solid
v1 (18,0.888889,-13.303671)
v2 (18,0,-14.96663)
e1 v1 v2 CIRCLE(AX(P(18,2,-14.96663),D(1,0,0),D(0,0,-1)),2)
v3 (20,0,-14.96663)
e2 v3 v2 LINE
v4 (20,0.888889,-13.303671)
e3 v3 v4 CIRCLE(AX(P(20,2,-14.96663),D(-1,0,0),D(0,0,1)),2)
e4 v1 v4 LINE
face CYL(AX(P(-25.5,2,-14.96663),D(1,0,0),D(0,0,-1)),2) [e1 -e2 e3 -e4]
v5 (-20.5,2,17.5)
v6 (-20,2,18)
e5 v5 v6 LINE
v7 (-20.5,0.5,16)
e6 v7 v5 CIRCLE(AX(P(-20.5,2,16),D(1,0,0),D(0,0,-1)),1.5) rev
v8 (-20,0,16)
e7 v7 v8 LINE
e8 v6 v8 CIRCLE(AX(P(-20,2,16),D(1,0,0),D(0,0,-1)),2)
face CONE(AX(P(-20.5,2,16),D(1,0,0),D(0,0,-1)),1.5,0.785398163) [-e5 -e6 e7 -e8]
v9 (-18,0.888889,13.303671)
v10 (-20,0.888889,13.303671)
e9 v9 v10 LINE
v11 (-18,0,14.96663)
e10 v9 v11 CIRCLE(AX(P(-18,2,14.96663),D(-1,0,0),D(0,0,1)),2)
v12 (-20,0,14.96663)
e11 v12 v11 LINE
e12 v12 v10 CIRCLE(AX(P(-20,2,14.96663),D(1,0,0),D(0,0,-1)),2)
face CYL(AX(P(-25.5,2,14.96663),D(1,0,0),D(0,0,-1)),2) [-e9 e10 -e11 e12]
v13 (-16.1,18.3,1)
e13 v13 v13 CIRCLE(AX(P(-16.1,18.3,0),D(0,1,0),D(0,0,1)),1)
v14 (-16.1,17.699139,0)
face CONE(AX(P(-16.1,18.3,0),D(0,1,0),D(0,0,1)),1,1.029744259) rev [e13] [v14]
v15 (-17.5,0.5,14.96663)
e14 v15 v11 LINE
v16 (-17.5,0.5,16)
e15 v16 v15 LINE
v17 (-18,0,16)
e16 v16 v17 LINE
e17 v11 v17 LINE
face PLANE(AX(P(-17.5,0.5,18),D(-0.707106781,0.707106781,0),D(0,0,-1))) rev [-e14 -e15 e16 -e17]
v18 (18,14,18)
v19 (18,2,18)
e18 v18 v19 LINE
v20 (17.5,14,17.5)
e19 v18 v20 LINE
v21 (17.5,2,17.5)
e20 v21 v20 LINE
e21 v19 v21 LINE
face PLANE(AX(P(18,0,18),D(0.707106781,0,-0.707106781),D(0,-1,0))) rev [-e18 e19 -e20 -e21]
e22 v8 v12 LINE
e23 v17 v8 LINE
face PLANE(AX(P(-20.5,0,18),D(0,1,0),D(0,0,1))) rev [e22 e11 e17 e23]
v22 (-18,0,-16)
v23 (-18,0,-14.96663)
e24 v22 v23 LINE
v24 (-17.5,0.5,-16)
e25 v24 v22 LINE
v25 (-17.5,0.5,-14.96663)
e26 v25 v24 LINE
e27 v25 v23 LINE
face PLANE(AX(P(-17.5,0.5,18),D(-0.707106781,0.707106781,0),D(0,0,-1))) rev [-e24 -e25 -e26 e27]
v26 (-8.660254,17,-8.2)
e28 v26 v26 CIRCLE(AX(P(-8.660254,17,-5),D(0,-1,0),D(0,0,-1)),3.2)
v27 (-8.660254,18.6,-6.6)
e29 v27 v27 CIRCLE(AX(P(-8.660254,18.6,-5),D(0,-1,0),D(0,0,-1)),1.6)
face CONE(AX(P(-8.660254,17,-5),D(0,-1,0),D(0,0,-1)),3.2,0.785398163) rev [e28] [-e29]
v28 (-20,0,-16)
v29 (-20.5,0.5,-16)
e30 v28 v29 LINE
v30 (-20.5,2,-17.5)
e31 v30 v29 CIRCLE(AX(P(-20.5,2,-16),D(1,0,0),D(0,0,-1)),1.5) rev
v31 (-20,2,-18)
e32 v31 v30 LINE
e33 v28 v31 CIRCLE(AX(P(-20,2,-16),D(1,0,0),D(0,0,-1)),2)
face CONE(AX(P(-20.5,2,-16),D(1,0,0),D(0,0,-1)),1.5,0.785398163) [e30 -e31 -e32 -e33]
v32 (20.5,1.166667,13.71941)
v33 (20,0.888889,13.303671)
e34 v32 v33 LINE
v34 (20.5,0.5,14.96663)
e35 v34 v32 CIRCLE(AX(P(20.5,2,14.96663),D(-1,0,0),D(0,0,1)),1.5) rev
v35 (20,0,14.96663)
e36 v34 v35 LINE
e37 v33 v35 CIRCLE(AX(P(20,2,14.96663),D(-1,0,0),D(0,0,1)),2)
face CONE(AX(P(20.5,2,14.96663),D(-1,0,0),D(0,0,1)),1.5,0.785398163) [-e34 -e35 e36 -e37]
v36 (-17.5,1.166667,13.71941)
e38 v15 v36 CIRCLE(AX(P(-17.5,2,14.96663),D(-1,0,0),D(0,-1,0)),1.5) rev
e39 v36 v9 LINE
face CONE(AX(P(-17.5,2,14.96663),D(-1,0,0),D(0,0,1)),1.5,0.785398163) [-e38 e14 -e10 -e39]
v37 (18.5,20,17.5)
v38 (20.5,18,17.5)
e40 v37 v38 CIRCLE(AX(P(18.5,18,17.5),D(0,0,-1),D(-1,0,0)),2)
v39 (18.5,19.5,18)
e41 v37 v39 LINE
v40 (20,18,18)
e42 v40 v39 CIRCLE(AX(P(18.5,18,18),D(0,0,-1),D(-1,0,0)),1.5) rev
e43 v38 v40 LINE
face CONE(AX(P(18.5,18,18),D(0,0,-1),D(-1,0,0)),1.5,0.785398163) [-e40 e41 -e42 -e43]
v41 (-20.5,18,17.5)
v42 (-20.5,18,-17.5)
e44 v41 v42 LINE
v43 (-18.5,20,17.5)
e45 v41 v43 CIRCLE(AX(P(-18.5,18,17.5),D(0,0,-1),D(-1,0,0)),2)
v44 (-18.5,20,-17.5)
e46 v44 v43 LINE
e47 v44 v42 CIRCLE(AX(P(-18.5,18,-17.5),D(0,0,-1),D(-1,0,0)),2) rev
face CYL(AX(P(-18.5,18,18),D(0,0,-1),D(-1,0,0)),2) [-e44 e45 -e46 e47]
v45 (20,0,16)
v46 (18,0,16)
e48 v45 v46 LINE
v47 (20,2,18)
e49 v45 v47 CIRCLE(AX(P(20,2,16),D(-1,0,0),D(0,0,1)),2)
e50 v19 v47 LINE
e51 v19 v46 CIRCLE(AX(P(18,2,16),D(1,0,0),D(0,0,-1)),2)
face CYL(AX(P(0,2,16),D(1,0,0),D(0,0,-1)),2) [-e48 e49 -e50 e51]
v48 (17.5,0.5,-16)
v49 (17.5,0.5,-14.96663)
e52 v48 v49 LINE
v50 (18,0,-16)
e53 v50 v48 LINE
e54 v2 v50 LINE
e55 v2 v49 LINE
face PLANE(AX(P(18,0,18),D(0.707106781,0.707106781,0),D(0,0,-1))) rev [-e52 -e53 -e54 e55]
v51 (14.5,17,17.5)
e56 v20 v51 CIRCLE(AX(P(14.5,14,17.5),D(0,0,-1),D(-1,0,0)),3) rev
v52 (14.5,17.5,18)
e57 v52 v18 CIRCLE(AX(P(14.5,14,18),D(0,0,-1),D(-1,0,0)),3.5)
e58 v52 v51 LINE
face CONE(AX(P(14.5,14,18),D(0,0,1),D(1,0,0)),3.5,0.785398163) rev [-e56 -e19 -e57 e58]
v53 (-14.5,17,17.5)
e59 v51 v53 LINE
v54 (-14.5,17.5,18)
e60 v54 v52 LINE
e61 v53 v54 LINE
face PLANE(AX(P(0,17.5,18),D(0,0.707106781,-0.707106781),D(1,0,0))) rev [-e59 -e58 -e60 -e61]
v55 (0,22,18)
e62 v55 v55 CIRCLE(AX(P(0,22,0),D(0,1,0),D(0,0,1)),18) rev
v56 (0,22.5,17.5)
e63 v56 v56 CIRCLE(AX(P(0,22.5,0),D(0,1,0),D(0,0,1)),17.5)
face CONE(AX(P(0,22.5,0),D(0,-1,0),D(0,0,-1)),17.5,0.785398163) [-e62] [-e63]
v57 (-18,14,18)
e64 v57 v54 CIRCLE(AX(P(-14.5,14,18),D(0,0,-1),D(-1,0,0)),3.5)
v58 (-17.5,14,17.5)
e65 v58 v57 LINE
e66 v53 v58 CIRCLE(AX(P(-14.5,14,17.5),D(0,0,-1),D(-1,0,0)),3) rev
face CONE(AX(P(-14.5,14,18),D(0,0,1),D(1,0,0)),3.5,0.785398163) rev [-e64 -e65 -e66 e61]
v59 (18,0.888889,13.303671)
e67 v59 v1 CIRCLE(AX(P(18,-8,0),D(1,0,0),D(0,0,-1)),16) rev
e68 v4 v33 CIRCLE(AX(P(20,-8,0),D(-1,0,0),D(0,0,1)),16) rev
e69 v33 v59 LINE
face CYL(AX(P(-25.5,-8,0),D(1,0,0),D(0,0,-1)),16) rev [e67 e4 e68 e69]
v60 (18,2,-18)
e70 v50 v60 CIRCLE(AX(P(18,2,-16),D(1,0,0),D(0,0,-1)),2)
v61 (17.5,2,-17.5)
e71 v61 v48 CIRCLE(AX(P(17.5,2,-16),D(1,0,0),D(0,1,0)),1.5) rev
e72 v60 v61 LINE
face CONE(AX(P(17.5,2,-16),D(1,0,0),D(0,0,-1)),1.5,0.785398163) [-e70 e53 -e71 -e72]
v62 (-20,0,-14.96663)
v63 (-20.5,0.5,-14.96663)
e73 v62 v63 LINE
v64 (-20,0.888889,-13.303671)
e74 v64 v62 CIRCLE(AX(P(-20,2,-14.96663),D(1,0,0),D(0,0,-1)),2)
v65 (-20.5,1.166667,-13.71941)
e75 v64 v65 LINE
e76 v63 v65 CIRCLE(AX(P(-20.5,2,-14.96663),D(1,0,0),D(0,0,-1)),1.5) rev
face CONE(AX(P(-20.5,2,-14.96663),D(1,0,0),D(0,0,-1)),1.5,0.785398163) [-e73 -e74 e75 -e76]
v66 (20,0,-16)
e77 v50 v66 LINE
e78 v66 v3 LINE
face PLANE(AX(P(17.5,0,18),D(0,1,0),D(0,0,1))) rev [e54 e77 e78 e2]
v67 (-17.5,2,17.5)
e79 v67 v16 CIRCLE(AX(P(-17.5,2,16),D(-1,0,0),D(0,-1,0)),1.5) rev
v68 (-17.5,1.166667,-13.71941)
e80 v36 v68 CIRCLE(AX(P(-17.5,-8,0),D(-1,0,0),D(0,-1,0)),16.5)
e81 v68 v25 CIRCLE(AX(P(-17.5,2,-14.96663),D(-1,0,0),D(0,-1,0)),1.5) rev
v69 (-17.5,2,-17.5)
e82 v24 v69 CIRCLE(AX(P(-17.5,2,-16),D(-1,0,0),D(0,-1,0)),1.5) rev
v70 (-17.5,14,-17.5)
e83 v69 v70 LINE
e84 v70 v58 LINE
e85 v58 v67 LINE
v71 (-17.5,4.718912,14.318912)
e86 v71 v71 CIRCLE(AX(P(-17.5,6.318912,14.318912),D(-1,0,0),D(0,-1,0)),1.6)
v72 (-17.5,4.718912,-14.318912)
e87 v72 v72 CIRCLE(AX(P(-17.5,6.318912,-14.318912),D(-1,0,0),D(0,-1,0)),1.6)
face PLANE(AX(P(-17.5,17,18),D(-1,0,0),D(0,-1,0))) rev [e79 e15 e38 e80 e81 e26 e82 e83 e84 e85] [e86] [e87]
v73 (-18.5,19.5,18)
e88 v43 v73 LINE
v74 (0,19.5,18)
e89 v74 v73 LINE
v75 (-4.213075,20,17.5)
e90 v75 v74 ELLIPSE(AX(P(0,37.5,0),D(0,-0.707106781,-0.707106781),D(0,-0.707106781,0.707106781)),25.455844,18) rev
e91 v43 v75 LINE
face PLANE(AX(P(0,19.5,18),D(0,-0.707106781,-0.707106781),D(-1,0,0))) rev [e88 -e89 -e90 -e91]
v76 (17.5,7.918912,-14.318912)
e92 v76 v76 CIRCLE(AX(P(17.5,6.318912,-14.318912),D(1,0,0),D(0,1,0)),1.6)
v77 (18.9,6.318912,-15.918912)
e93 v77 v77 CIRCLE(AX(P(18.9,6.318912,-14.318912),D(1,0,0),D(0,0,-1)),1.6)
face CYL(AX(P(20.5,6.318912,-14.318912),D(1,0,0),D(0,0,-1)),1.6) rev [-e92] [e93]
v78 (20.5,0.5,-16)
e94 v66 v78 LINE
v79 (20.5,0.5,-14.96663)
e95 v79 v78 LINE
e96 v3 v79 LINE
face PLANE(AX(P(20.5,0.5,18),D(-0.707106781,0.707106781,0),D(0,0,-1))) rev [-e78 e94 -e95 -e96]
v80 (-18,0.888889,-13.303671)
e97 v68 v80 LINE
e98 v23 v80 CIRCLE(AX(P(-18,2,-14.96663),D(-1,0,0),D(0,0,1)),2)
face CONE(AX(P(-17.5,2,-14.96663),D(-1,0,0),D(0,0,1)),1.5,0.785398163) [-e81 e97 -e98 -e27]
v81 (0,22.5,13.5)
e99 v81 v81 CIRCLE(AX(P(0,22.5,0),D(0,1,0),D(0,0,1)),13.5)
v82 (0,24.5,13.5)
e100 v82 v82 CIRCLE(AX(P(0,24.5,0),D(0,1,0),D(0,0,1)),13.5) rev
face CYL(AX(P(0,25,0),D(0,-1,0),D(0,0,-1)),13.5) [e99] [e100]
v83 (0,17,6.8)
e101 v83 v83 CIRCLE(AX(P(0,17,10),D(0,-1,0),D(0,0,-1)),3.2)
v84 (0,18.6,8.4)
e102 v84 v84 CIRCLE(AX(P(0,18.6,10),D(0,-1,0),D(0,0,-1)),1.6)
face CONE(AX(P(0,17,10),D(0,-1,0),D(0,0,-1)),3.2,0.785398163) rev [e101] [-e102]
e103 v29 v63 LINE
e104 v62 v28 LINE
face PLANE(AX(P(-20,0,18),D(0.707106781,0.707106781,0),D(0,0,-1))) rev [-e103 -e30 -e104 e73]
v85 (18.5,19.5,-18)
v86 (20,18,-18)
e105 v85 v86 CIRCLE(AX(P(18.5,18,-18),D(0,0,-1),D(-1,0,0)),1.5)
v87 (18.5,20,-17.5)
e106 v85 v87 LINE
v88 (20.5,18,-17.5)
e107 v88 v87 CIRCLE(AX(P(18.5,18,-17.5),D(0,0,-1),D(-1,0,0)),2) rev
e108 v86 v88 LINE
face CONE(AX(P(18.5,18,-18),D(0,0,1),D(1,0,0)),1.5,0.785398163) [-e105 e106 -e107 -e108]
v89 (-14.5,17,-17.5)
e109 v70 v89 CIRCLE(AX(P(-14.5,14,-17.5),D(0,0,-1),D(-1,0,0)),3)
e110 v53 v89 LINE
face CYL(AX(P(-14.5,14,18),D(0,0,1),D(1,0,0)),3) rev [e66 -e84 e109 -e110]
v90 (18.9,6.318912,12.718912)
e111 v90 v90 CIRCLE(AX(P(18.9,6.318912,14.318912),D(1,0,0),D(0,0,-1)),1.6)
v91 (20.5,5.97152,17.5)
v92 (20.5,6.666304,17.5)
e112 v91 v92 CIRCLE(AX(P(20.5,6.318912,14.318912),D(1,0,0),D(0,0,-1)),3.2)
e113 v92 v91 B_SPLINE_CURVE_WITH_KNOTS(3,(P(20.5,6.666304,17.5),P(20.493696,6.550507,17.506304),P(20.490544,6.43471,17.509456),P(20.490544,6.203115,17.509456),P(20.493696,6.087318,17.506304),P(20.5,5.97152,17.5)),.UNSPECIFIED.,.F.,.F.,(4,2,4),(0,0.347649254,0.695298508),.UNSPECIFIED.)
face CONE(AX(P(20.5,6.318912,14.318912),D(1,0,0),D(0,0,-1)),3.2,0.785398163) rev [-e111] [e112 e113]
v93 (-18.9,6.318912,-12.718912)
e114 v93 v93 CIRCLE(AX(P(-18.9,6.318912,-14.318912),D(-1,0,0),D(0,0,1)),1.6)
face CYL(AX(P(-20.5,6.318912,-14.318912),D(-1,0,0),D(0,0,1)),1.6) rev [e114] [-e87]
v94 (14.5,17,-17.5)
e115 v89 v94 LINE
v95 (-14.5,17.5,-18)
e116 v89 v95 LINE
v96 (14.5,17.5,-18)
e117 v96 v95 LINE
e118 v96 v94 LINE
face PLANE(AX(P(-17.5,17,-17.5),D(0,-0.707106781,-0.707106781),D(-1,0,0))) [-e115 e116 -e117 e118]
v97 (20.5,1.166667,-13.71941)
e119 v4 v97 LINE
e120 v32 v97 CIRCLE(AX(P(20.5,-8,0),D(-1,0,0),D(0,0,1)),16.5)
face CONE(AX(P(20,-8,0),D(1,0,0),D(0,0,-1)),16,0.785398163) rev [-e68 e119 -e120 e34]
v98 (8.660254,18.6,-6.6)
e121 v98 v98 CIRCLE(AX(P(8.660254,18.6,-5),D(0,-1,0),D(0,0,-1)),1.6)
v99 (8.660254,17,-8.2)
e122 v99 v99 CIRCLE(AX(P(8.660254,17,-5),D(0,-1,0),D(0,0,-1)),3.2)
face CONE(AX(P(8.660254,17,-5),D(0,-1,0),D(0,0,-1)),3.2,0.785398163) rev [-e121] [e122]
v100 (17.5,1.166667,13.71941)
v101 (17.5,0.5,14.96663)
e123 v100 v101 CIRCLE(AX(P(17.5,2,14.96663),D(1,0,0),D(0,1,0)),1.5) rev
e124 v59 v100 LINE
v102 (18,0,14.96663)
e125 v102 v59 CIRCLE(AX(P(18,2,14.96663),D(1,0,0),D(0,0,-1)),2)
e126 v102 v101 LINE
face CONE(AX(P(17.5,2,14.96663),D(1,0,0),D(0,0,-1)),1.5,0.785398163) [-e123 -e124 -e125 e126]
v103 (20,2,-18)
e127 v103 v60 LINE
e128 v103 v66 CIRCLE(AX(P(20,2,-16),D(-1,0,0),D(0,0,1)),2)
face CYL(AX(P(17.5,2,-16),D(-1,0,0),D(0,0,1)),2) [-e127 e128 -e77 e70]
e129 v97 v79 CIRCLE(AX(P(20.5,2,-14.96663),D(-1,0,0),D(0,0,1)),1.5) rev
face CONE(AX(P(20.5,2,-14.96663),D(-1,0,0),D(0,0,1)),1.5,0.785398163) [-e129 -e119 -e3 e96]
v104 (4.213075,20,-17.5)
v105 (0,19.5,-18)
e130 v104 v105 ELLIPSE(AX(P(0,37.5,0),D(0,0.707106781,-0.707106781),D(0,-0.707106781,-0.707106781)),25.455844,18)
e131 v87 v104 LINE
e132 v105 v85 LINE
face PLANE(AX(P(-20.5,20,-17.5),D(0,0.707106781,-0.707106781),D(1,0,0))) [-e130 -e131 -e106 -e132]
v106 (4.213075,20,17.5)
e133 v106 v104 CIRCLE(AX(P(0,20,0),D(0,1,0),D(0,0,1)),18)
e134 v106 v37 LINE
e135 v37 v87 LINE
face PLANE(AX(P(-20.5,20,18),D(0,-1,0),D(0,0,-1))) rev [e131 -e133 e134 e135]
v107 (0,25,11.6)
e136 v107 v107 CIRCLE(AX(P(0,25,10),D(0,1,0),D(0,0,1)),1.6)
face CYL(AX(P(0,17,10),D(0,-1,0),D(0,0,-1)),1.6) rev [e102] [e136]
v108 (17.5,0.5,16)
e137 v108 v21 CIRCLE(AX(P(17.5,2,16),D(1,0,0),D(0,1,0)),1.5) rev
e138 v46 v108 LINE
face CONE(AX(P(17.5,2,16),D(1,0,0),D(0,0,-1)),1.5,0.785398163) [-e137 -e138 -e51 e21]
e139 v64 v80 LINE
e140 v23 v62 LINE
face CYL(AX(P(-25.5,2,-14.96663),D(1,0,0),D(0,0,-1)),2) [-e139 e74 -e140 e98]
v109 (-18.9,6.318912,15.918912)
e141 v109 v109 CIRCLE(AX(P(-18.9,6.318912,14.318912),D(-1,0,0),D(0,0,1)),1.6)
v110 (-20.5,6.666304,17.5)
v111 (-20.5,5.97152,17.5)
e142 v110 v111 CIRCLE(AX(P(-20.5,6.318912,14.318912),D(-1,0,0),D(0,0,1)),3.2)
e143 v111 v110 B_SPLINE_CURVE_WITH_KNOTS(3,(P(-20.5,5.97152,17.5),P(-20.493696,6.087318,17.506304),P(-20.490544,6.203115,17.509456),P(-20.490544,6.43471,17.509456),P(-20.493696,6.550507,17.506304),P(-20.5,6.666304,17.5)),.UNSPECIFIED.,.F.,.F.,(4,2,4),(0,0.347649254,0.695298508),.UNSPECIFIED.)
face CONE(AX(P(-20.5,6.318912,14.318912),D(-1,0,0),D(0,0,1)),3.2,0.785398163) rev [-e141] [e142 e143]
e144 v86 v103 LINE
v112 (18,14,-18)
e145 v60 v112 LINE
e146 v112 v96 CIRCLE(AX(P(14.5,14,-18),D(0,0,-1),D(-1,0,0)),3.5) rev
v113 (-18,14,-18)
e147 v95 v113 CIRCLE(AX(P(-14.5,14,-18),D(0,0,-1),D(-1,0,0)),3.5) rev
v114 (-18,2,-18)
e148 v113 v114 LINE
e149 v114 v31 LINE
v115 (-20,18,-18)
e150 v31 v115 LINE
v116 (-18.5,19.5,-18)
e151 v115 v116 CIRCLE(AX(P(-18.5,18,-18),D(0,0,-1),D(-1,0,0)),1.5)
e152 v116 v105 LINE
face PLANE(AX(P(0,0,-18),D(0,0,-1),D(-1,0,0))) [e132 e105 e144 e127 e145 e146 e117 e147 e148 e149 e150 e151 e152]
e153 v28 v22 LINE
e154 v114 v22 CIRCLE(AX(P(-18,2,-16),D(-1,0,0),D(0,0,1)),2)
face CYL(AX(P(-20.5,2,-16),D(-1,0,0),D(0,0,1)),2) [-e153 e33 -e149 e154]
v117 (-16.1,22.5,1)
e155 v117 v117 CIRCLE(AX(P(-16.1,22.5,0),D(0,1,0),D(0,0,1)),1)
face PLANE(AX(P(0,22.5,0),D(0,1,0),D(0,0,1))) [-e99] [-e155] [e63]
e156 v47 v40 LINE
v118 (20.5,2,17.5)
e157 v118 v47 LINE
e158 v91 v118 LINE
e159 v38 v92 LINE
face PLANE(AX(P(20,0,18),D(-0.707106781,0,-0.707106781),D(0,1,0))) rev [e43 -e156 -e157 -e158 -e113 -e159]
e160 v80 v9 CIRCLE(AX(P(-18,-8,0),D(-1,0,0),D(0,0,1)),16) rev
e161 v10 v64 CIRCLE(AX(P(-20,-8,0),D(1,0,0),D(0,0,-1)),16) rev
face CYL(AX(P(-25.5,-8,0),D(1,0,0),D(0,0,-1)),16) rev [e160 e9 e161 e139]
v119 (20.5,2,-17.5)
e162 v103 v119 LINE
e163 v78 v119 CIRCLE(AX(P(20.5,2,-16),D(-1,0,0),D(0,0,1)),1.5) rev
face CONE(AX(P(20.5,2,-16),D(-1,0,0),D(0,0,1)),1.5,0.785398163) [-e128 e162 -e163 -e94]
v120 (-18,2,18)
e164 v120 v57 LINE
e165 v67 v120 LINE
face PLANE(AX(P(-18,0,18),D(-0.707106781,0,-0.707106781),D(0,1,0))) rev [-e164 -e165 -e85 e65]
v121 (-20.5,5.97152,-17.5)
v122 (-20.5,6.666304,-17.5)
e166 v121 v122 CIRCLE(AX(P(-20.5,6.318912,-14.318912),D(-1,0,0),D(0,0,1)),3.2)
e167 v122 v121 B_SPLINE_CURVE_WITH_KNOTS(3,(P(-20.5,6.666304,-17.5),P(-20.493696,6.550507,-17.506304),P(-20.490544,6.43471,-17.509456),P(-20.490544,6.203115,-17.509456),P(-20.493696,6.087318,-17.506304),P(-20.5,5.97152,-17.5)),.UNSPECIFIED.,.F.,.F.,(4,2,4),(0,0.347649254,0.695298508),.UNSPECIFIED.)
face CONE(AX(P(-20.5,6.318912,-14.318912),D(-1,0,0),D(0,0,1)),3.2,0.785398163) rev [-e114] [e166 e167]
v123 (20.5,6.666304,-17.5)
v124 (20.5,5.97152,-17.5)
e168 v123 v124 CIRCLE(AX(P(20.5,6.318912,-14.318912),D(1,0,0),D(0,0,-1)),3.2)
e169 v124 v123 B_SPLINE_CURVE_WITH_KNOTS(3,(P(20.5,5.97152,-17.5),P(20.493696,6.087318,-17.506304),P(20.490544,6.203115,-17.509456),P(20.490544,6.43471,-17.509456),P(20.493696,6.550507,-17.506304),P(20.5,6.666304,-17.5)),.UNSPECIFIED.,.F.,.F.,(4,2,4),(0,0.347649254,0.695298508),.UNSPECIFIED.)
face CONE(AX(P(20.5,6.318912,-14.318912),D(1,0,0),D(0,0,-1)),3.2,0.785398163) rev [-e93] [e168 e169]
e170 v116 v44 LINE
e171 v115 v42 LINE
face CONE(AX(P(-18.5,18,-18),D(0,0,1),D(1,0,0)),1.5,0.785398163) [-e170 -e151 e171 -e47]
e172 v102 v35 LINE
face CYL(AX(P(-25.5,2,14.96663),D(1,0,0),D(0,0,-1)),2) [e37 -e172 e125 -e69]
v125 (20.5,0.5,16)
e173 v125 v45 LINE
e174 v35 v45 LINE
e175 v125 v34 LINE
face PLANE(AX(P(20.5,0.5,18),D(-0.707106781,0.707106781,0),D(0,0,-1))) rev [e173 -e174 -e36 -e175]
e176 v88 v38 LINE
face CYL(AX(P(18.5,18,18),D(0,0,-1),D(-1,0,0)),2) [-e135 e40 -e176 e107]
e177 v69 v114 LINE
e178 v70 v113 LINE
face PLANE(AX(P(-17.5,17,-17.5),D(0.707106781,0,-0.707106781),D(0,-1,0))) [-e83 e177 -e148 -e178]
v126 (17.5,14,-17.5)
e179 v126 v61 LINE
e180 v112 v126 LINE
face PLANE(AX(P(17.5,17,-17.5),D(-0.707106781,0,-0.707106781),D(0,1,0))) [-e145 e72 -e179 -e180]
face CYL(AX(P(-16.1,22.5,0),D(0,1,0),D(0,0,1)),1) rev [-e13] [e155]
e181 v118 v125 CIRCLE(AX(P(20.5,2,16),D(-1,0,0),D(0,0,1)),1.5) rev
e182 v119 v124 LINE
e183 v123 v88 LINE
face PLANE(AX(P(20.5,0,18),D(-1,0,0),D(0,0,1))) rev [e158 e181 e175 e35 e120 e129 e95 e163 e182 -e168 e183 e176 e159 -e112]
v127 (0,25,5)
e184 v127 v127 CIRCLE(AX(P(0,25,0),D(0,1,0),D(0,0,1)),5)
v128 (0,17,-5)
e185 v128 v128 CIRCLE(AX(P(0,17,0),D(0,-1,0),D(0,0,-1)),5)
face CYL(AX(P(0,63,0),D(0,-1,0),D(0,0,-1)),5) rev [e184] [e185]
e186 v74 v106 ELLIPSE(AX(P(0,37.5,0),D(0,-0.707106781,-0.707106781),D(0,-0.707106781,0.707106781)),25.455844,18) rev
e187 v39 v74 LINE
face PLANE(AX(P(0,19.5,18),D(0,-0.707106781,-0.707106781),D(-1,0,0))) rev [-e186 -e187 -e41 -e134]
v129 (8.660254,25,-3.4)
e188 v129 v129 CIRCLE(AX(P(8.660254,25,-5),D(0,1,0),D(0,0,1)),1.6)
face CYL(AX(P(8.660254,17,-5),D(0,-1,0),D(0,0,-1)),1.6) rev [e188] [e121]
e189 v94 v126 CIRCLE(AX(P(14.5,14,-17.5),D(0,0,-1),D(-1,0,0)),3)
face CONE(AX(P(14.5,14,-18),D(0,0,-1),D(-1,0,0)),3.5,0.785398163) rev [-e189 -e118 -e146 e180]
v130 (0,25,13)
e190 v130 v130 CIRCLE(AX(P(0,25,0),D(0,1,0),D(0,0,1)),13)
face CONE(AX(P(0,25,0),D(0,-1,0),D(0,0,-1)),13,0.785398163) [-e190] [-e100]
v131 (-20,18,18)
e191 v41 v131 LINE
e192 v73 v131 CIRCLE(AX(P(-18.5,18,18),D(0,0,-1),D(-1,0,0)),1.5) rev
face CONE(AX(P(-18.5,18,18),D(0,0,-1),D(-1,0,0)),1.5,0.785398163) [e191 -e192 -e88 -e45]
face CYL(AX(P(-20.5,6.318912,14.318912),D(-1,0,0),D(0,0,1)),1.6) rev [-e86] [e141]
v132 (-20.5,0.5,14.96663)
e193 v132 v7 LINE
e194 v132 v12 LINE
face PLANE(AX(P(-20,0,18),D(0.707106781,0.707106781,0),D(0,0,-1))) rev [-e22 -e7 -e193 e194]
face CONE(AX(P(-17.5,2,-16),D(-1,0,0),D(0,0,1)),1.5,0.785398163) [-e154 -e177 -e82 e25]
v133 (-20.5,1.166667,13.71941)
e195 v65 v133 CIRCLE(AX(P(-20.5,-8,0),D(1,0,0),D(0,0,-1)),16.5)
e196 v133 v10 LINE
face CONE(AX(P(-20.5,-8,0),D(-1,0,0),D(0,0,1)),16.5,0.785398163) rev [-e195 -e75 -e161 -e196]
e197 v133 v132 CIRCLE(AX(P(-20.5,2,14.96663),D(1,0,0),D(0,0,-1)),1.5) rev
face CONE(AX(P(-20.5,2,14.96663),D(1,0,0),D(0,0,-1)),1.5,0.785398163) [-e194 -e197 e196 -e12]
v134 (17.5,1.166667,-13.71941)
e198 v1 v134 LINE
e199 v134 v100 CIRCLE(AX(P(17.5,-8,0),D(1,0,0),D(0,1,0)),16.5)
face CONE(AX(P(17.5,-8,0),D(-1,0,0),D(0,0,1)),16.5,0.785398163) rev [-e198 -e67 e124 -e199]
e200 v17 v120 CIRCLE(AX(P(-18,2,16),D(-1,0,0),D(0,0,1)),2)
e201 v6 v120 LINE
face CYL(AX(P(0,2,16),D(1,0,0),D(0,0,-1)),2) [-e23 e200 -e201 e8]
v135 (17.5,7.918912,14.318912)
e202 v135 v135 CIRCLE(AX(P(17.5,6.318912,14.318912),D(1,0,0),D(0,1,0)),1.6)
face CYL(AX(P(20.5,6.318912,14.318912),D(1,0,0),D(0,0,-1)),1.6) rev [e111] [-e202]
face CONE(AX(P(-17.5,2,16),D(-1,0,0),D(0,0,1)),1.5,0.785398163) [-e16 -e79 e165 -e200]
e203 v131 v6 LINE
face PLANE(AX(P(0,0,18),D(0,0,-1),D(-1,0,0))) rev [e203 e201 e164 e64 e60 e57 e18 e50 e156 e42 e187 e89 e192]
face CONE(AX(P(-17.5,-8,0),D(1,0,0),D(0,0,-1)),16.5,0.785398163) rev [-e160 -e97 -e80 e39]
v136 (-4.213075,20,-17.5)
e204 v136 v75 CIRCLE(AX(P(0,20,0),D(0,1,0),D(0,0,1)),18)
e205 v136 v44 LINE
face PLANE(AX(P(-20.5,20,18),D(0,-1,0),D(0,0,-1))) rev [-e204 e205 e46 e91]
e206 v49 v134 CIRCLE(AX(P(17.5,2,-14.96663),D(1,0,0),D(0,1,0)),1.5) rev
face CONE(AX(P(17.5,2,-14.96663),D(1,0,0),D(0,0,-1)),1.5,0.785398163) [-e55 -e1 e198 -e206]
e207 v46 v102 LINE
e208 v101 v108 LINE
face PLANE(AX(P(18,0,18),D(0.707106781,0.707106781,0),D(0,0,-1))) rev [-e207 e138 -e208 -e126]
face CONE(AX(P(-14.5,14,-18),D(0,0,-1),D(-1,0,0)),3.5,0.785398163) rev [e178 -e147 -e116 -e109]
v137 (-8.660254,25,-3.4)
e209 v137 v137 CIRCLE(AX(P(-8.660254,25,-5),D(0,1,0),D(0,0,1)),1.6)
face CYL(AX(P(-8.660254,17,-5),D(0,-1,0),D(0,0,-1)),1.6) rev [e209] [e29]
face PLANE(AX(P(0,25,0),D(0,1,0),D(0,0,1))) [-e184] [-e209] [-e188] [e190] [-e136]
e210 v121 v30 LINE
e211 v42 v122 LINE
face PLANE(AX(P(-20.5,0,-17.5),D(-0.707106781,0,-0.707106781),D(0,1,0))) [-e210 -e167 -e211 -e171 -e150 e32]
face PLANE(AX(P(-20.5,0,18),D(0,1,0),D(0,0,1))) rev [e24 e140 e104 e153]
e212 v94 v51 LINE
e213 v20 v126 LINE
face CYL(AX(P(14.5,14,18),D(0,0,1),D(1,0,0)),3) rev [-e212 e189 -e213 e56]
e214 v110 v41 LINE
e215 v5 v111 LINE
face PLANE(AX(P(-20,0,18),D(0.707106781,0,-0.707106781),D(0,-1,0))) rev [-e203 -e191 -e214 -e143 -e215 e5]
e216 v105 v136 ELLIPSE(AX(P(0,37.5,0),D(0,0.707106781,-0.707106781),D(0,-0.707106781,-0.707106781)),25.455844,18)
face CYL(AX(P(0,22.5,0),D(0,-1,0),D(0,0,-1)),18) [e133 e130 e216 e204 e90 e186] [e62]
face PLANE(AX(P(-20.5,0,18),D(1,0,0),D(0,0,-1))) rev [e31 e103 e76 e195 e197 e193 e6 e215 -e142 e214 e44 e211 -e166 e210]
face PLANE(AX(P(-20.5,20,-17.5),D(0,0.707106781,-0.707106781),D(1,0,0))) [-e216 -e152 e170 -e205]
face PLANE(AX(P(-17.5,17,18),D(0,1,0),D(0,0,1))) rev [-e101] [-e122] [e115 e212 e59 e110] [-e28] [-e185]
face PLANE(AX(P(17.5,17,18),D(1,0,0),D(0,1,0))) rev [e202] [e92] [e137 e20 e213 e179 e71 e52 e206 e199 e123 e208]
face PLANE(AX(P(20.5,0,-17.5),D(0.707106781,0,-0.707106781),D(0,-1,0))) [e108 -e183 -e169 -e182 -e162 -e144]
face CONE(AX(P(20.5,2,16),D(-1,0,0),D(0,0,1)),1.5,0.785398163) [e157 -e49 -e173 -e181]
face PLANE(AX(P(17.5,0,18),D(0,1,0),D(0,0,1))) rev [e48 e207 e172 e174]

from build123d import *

# Parameters (mm, degrees)
EXTRUDE_1_DEPTH              = 18
SKETCH_3_R                   = 16
CUT_EXTRUDE_1_DEPTH          = 46
SKETCH_11_R                  = 13.5
EXTRUDE_2_DEPTH              = 5
SKETCH_12_R                  = 18
EXTRUDE_5_DEPTH              = 2.5
HOLE_WIZARD_M3_3_D           = 3.2
HOLE_WIZARD_M3_3_CSINK_D     = 6.4
HOLE_WIZARD_M3_3_CSINK_ANGLE = 90
SKETCH_9_R                   = 5
CUT_EXTRUDE_2_DEPTH          = 46
F_2_0MM_1_D                  = 2
F_2_0MM_1_DEPTH              = 4.2
F_2_0MM_1_TIP                = 0.600860619
HOLE_WIZARD_M3_1_D           = 3.2
HOLE_WIZARD_M3_1_DEPTH       = 6
HOLE_WIZARD_M3_1_CSINK_D     = 6.4
HOLE_WIZARD_M3_1_CSINK_ANGLE = 90
HOLE_WIZARD_M3_1_TIP         = 0.96137699
HOLE_WIZARD_M3_2_D           = 3.2
HOLE_WIZARD_M3_2_DEPTH       = 6
HOLE_WIZARD_M3_2_CSINK_D     = 6.4
HOLE_WIZARD_M3_2_CSINK_ANGLE = 90
HOLE_WIZARD_M3_2_TIP         = 0.96137699
FILLET_1_R                   = 2
FILLET_2_R                   = 3
FILLET_3_R                   = 2
CHAMFER_3_SIZE               = 0.5


with BuildPart() as part:
    # 草图2 → 凸台-拉伸1 (new, symmetric)
    with BuildSketch(Plane.XY):
        Polygon((17.5, 17), (17.5, 0), (20.5, 0), (20.5, 20), (-20.5, 20), (-20.5, 0), (-17.5, 0), (-17.5, 17), align=None)
    extrude(amount=EXTRUDE_1_DEPTH, both=True)

    # 草图3 → 切除-拉伸1 (cut)
    with BuildSketch(Plane(origin=(20.5, 0, 0), x_dir=(0, 0, -1), z_dir=(1, 0, 0))):
        with Locations((0, -8)):
            Circle(SKETCH_3_R)
    extrude(amount=-CUT_EXTRUDE_1_DEPTH, mode=Mode.SUBTRACT)

    # 草图11 → 凸台-拉伸2 (add)
    with BuildSketch(Plane(origin=(0, 20, 0), x_dir=(1, 0, 0), z_dir=(0, 1, 0))):
        with Locations(Location((0, 0, 0), (0, 0, 270))):
            Circle(SKETCH_11_R)
    extrude(amount=EXTRUDE_2_DEPTH)

    # 草图12 → 凸台-拉伸5 (add)
    with BuildSketch(Plane(origin=(0, 20, 0), x_dir=(1, 0, 0), z_dir=(0, 1, 0))):
        with Locations(Location((0, 0, 0), (0, 0, 270))):
            Circle(SKETCH_12_R)
    extrude(amount=EXTRUDE_5_DEPTH)

    # M3 开槽半沉头螺钉的锥形沉头孔3 (through all)
    with Locations(Plane.XZ.offset(-17)):
        with Locations((0, 10), (8.660254038, -5), (-8.660254038, -5)):
            CounterSinkHole(HOLE_WIZARD_M3_3_D / 2, HOLE_WIZARD_M3_3_CSINK_D / 2, counter_sink_angle=HOLE_WIZARD_M3_3_CSINK_ANGLE)

    # 草图9 → 切除-拉伸2 (cut)
    with BuildSketch(Plane.XZ.offset(-17)):
        with Locations(Location((0, 0, 0), (0, 0, 270))):
            Circle(SKETCH_9_R)
    extrude(amount=-CUT_EXTRUDE_2_DEPTH, mode=Mode.SUBTRACT)

    # Ø2.0mm 暗销孔1
    with Locations(Plane(origin=(0, 22.5, 0), x_dir=(1, 0, 0), z_dir=(0, 1, 0))):
        with Locations((-16.1, 0)):
            Hole(F_2_0MM_1_D / 2, depth=F_2_0MM_1_DEPTH)
            with Locations((0, 0, -(F_2_0MM_1_DEPTH + F_2_0MM_1_TIP / 2))):  # 118° drill point
                Cone(0, F_2_0MM_1_D / 2, F_2_0MM_1_TIP, mode=Mode.SUBTRACT)

    # M3 开槽半沉头螺钉的锥形沉头孔1
    with Locations(Plane(origin=(20.5, 0, 0), x_dir=(0, 0, -1), z_dir=(1, 0, 0))):
        with Locations((14.318912319, 6.318912319), (-14.318912319, 6.318912319)):
            CounterSinkHole(HOLE_WIZARD_M3_1_D / 2, HOLE_WIZARD_M3_1_CSINK_D / 2, depth=HOLE_WIZARD_M3_1_DEPTH, counter_sink_angle=HOLE_WIZARD_M3_1_CSINK_ANGLE)
            with Locations((0, 0, -(HOLE_WIZARD_M3_1_DEPTH + HOLE_WIZARD_M3_1_TIP / 2))):  # 118° drill point
                Cone(0, HOLE_WIZARD_M3_1_D / 2, HOLE_WIZARD_M3_1_TIP, mode=Mode.SUBTRACT)

    # M3 开槽半沉头螺钉的锥形沉头孔2
    with Locations(Plane.ZY.offset(20.5)):
        with Locations((-14.318912319, 6.318912319), (14.318912319, 6.318912319)):
            CounterSinkHole(HOLE_WIZARD_M3_2_D / 2, HOLE_WIZARD_M3_2_CSINK_D / 2, depth=HOLE_WIZARD_M3_2_DEPTH, counter_sink_angle=HOLE_WIZARD_M3_2_CSINK_ANGLE)
            with Locations((0, 0, -(HOLE_WIZARD_M3_2_DEPTH + HOLE_WIZARD_M3_2_TIP / 2))):  # 118° drill point
                Cone(0, HOLE_WIZARD_M3_2_D / 2, HOLE_WIZARD_M3_2_TIP, mode=Mode.SUBTRACT)

    # 圆角1
    fillet_1_edges = [part.edges().sort_by_distance(p)[0] for p in [
        (19, 0, -18),
        (19, 0, 18),
        (-19, 0, 18),
        (19, 0, 13.856406461),
        (19, 0, -13.856406461),
        (-19, 0, -13.856406461),
        (-19, 0, 13.856406461),
        (-19, 0, -18),
    ]]
    fillet(fillet_1_edges, radius=FILLET_1_R)

    # 圆角2
    fillet_2_edges = [part.edges().sort_by_distance(p)[0] for p in [
        (-17.5, 17, 0),
        (17.5, 17, 0),
    ]]
    fillet(fillet_2_edges, radius=FILLET_2_R)

    # 圆角3
    fillet_3_edges = [part.edges().sort_by_distance(p)[0] for p in [
        (-20.5, 20, 0),
        (20.5, 20, 0),
    ]]
    fillet(fillet_3_edges, radius=FILLET_3_R)

    # 倒角3
    # the kernel refuses this chamfer: 0.5 mm, written as the material it takes off along each edge
    with BuildSketch(Plane(origin=(20.5, 0, -16), x_dir=(0.02749587661058908, 0.9996219169112968, 0), z_dir=(0, 0, 1)), Plane(origin=(20.5, 0, 14.966629547), x_dir=(0.02749587661058908, 0.9996219169112968, 0), z_dir=(0, 0, 1))) as chamfer_3_piece_1:
        Polygon((CHAMFER_3_SIZE * 0.999621916911, CHAMFER_3_SIZE * 0.0274958766106), (-CHAMFER_3_SIZE * 0.0274958766106, CHAMFER_3_SIZE * 0.999621916911), (0, 0), align=None)
    extrude(amount=1.033370453, mode=Mode.SUBTRACT)
    with BuildSketch(Plane(origin=(17.5, 0, -16), x_dir=(-0.02749587661058908, 0.9996219169112968, 0), z_dir=(0, 0, 1)), Plane(origin=(17.5, 0, 14.966629547), x_dir=(-0.02749587661058908, 0.9996219169112968, 0), z_dir=(0, 0, 1)), Plane(origin=(-17.5, 0, -14.966629547), x_dir=(0.02749587661058908, 0.9996219169112968, 0), z_dir=(0, 0, -1)), Plane(origin=(-20.5, 0, -16), x_dir=(-0.02749587661058908, 0.9996219169112968, 0), z_dir=(0, 0, 1)), Plane(origin=(-17.5, 0, 16), x_dir=(0.02749587661058908, 0.9996219169112968, 0), z_dir=(0, 0, -1)), Plane(origin=(-20.5, 0, 14.966629547), x_dir=(-0.02749587661058908, 0.9996219169112968, 0), z_dir=(0, 0, 1))) as chamfer_3_piece_2:
        Polygon((CHAMFER_3_SIZE * 0.999621916911, -CHAMFER_3_SIZE * 0.0274958766106), (-CHAMFER_3_SIZE * 0.0274958766106, -CHAMFER_3_SIZE * 0.999621916911), (0, 0), align=None)
    extrude(amount=1.033370453, mode=Mode.SUBTRACT)
    with BuildSketch(Plane(origin=(20.5, -8, 0), x_dir=(0, 0.5555555555555556, -0.8314794192830981), z_dir=(0, -0.8314794192830981, -0.5555555555555556))) as chamfer_3_piece_3:
        Polygon((16 + CHAMFER_3_SIZE, 0), (16, -CHAMFER_3_SIZE), (16, 0), align=None)
    revolve(axis=Axis((20.5, -8, 0), (1, 0, 0)), revolution_arc=112.502022808, mode=Mode.SUBTRACT)
    with BuildSketch(Plane(origin=(20.5, 2, -18), x_dir=(0.027495876610589005, 0, 0.9996219169112968), z_dir=(0, 1, 0)), Plane(origin=(20.5, 2, 18), x_dir=(-0.9996219169112968, 0, 0.027495876610589005), z_dir=(0, 1, 0)), Plane(origin=(-20.5, 18, -18), x_dir=(-0.027495876610589005, 0, 0.9996219169112968), z_dir=(0, -1, 0)), Plane(origin=(-20.5, 18, 18), x_dir=(0.9996219169112968, 0, 0.027495876610589005), z_dir=(0, -1, 0))) as chamfer_3_piece_4:
        Polygon((CHAMFER_3_SIZE * 0.999621916911, -CHAMFER_3_SIZE * 0.0274958766106), (-CHAMFER_3_SIZE * 0.0274958766106, -CHAMFER_3_SIZE * 0.999621916911), (0, 0), align=None)
    extrude(amount=16, mode=Mode.SUBTRACT)
    with BuildSketch(Plane(origin=(20.5, 2, 16), x_dir=(0, -1, 0), z_dir=(0, 0, -1))) as chamfer_3_piece_5:
        Polygon((2 - CHAMFER_3_SIZE, 0), (2, CHAMFER_3_SIZE), (2, 0), align=None)
    revolve(axis=Axis((20.5, 2, 16), (-1, 0, 0)), revolution_arc=90, mode=Mode.SUBTRACT)
    with BuildSketch(Plane(origin=(20.5, 2, 14.966629547), x_dir=(0, -0.555555555555556, -0.8314794192830979), z_dir=(0, 0.8314794192830979, -0.555555555555556))) as chamfer_3_piece_6:
        Polygon((2 - CHAMFER_3_SIZE, 0), (2, CHAMFER_3_SIZE), (2, 0), align=None)
    revolve(axis=Axis((20.5, 2, 14.966629547), (-1, 0, 0)), revolution_arc=56.251011404, mode=Mode.SUBTRACT)
    with BuildSketch(Plane(origin=(20.5, 2, -14.966629547), x_dir=(0, -0.5555555555555557, 0.8314794192830981), z_dir=(0, 0.8314794192830981, 0.5555555555555557))) as chamfer_3_piece_7:
        Polygon((2 - CHAMFER_3_SIZE, 0), (2, -CHAMFER_3_SIZE), (2, 0), align=None)
    revolve(axis=Axis((20.5, 2, -14.966629547), (1, 0, 0)), revolution_arc=56.251011404, mode=Mode.SUBTRACT)
    with BuildSketch(Plane(origin=(20.5, 2, -16), x_dir=(0, -1, 0), z_dir=(0, 0, 1))) as chamfer_3_piece_8:
        Polygon((2 - CHAMFER_3_SIZE, 0), (2, -CHAMFER_3_SIZE), (2, 0), align=None)
    revolve(axis=Axis((20.5, 2, -16), (1, 0, 0)), revolution_arc=90, mode=Mode.SUBTRACT)
    with BuildSketch(Plane(origin=(-17.5, 2, -18), x_dir=(0.027495876610589005, 0, 0.9996219169112968), z_dir=(0, 1, 0)), Plane(origin=(-17.5, 2, 18), x_dir=(-0.9996219169112968, 0, 0.027495876610589005), z_dir=(0, 1, 0)), Plane(origin=(17.5, 14, -18), x_dir=(-0.027495876610589005, 0, 0.9996219169112968), z_dir=(0, -1, 0)), Plane(origin=(17.5, 14, 18), x_dir=(0.9996219169112968, 0, 0.027495876610589005), z_dir=(0, -1, 0))) as chamfer_3_piece_9:
        Polygon((CHAMFER_3_SIZE * 0.999621916911, -CHAMFER_3_SIZE * 0.0274958766106), (-CHAMFER_3_SIZE * 0.0274958766106, -CHAMFER_3_SIZE * 0.999621916911), (0, 0), align=None)
    extrude(amount=12, mode=Mode.SUBTRACT)
    with BuildSketch(Plane(origin=(17.5, -8, 0), x_dir=(0, 0.5555555555555556, -0.8314794192830981), z_dir=(0, -0.8314794192830981, -0.5555555555555556))) as chamfer_3_piece_10:
        Polygon((16 + CHAMFER_3_SIZE, 0), (16, CHAMFER_3_SIZE), (16, 0), align=None)
    revolve(axis=Axis((17.5, -8, 0), (1, 0, 0)), revolution_arc=112.502022808, mode=Mode.SUBTRACT)
    with BuildSketch(Plane(origin=(17.5, 2, 16), x_dir=(0, -1, 0), z_dir=(0, 0, -1))) as chamfer_3_piece_11:
        Polygon((2, -CHAMFER_3_SIZE), (2 - CHAMFER_3_SIZE, 0), (2, 0), align=None)
    revolve(axis=Axis((17.5, 2, 16), (-1, 0, 0)), revolution_arc=90, mode=Mode.SUBTRACT)
    with BuildSketch(Plane(origin=(17.5, 2, 14.966629547), x_dir=(0, -0.5555555555555564, -0.8314794192830977), z_dir=(0, 0.8314794192830977, -0.5555555555555564))) as chamfer_3_piece_12:
        Polygon((2 - CHAMFER_3_SIZE, 0), (2, -CHAMFER_3_SIZE), (2, 0), align=None)
    revolve(axis=Axis((17.5, 2, 14.966629547), (-1, 0, 0)), revolution_arc=56.251011404, mode=Mode.SUBTRACT)
    with BuildSketch(Plane(origin=(17.5, 2, -14.966629547), x_dir=(0, -0.5555555555555557, 0.8314794192830981), z_dir=(0, 0.8314794192830981, 0.5555555555555557))) as chamfer_3_piece_13:
        Polygon((2 - CHAMFER_3_SIZE, 0), (2, CHAMFER_3_SIZE), (2, 0), align=None)
    revolve(axis=Axis((17.5, 2, -14.966629547), (1, 0, 0)), revolution_arc=56.251011404, mode=Mode.SUBTRACT)
    with BuildSketch(Plane(origin=(17.5, 2, -16), x_dir=(0, -1, 0), z_dir=(0, 0, 1))) as chamfer_3_piece_14:
        Polygon((2 - CHAMFER_3_SIZE, 0), (2, CHAMFER_3_SIZE), (2, 0), align=None)
    revolve(axis=Axis((17.5, 2, -16), (1, 0, 0)), revolution_arc=90, mode=Mode.SUBTRACT)
    with BuildSketch(Plane(origin=(-17.5, -8, 0), x_dir=(0, 0.5555555555555556, -0.8314794192830981), z_dir=(0, -0.8314794192830981, -0.5555555555555556))) as chamfer_3_piece_15:
        Polygon((16 + CHAMFER_3_SIZE, 0), (16, -CHAMFER_3_SIZE), (16, 0), align=None)
    revolve(axis=Axis((-17.5, -8, 0), (1, 0, 0)), revolution_arc=112.502022808, mode=Mode.SUBTRACT)
    with BuildSketch(Plane(origin=(-17.5, 2, 16), x_dir=(0, -1, 0), z_dir=(0, 0, -1))) as chamfer_3_piece_16:
        Polygon((2, CHAMFER_3_SIZE), (2 - CHAMFER_3_SIZE, 0), (2, 0), align=None)
    revolve(axis=Axis((-17.5, 2, 16), (-1, 0, 0)), revolution_arc=90, mode=Mode.SUBTRACT)
    with BuildSketch(Plane(origin=(-17.5, 2, 14.966629547), x_dir=(0, -1, 0), z_dir=(0, 0, 1))) as chamfer_3_piece_17:
        Polygon((2 - CHAMFER_3_SIZE, 0), (2, -CHAMFER_3_SIZE), (2, 0), align=None)
    revolve(axis=Axis((-17.5, 2, 14.966629547), (1, 0, 0)), revolution_arc=56.251011404, mode=Mode.SUBTRACT)
    with BuildSketch(Plane(origin=(-17.5, 2, -14.966629547), x_dir=(0, -0.5555555555555557, 0.8314794192830981), z_dir=(0, 0.8314794192830981, 0.5555555555555557))) as chamfer_3_piece_18:
        Polygon((2 - CHAMFER_3_SIZE, 0), (2, -CHAMFER_3_SIZE), (2, 0), align=None)
    revolve(axis=Axis((-17.5, 2, -14.966629547), (1, 0, 0)), revolution_arc=56.251011404, mode=Mode.SUBTRACT)
    with BuildSketch(Plane(origin=(-17.5, 2, -16), x_dir=(0, -1, 0), z_dir=(0, 0, 1))) as chamfer_3_piece_19:
        Polygon((2 - CHAMFER_3_SIZE, 0), (2, -CHAMFER_3_SIZE), (2, 0), align=None)
    revolve(axis=Axis((-17.5, 2, -16), (1, 0, 0)), revolution_arc=90, mode=Mode.SUBTRACT)
    with BuildSketch(Plane(origin=(-20.5, -8, 0), x_dir=(0, 0.5555555555555556, -0.8314794192830981), z_dir=(0, -0.8314794192830981, -0.5555555555555556))) as chamfer_3_piece_20:
        Polygon((16 + CHAMFER_3_SIZE, 0), (16, CHAMFER_3_SIZE), (16, 0), align=None)
    revolve(axis=Axis((-20.5, -8, 0), (1, 0, 0)), revolution_arc=112.502022808, mode=Mode.SUBTRACT)
    with BuildSketch(Plane(origin=(-20.5, 2, 16), x_dir=(0, -1, 0), z_dir=(0, 0, -1))) as chamfer_3_piece_21:
        Polygon((2 - CHAMFER_3_SIZE, 0), (2, -CHAMFER_3_SIZE), (2, 0), align=None)
    revolve(axis=Axis((-20.5, 2, 16), (-1, 0, 0)), revolution_arc=90, mode=Mode.SUBTRACT)
    with BuildSketch(Plane(origin=(-20.5, 2, 14.966629547), x_dir=(0, -1, 0), z_dir=(0, 0, 1))) as chamfer_3_piece_22:
        Polygon((2 - CHAMFER_3_SIZE, 0), (2, CHAMFER_3_SIZE), (2, 0), align=None)
    revolve(axis=Axis((-20.5, 2, 14.966629547), (1, 0, 0)), revolution_arc=56.251011404, mode=Mode.SUBTRACT)
    with BuildSketch(Plane(origin=(-20.5, 2, -14.966629547), x_dir=(0, -0.5555555555555557, 0.8314794192830981), z_dir=(0, 0.8314794192830981, 0.5555555555555557))) as chamfer_3_piece_23:
        Polygon((2 - CHAMFER_3_SIZE, 0), (2, CHAMFER_3_SIZE), (2, 0), align=None)
    revolve(axis=Axis((-20.5, 2, -14.966629547), (1, 0, 0)), revolution_arc=56.251011404, mode=Mode.SUBTRACT)
    with BuildSketch(Plane(origin=(-20.5, 2, -16), x_dir=(0, -1, 0), z_dir=(0, 0, 1))) as chamfer_3_piece_24:
        Polygon((2 - CHAMFER_3_SIZE, 0), (2, CHAMFER_3_SIZE), (2, 0), align=None)
    revolve(axis=Axis((-20.5, 2, -16), (1, 0, 0)), revolution_arc=90, mode=Mode.SUBTRACT)
    with BuildSketch(Plane(origin=(-14.5, 17, -18), x_dir=(0, -0.027495876610589005, 0.9996219169112968), z_dir=(1, 0, 0)), Plane(origin=(-14.5, 17, 18), x_dir=(0, 0.9996219169112968, 0.027495876610589005), z_dir=(1, 0, 0))) as chamfer_3_piece_25:
        Polygon((CHAMFER_3_SIZE * 0.999621916911, -CHAMFER_3_SIZE * 0.0274958766106), (-CHAMFER_3_SIZE * 0.0274958766106, -CHAMFER_3_SIZE * 0.999621916911), (0, 0), align=None)
    extrude(amount=29, mode=Mode.SUBTRACT)
    with BuildSketch(Plane(origin=(-14.5, 14, -18), x_dir=(0, 1, 0), z_dir=(1, 0, 0))) as chamfer_3_piece_26:
        Polygon((3, CHAMFER_3_SIZE), (3 + CHAMFER_3_SIZE, 0), (3, 0), align=None)
    revolve(axis=Axis((-14.5, 14, -18), (0, 0, 1)), revolution_arc=90, mode=Mode.SUBTRACT)
    with BuildSketch(Plane(origin=(-14.5, 14, 18), x_dir=(0, 1, 0), z_dir=(1, 0, 0))) as chamfer_3_piece_27:
        Polygon((3 + CHAMFER_3_SIZE, 0), (3, -CHAMFER_3_SIZE), (3, 0), align=None)
    revolve(axis=Axis((-14.5, 14, 18), (0, 0, 1)), revolution_arc=90, mode=Mode.SUBTRACT)
    with BuildSketch(Plane(origin=(14.5, 14, -18), x_dir=(1, 0, 0), z_dir=(0, -1, 0))) as chamfer_3_piece_28:
        Polygon((3, CHAMFER_3_SIZE), (3 + CHAMFER_3_SIZE, 0), (3, 0), align=None)
    revolve(axis=Axis((14.5, 14, -18), (0, 0, 1)), revolution_arc=90, mode=Mode.SUBTRACT)
    with BuildSketch(Plane(origin=(14.5, 14, 18), x_dir=(1, 0, 0), z_dir=(0, -1, 0))) as chamfer_3_piece_29:
        Polygon((3 + CHAMFER_3_SIZE, 0), (3, -CHAMFER_3_SIZE), (3, 0), align=None)
    revolve(axis=Axis((14.5, 14, 18), (0, 0, 1)), revolution_arc=90, mode=Mode.SUBTRACT)
    with BuildSketch(Plane(origin=(18.5, 20, -18), x_dir=(0, 0.027495876610589005, 0.9996219169112968), z_dir=(-1, 0, 0))) as chamfer_3_piece_30_section:
        Polygon((CHAMFER_3_SIZE * 0.999621916911, -CHAMFER_3_SIZE * 0.0274958766106), (-CHAMFER_3_SIZE * 0.0274958766106, -CHAMFER_3_SIZE * 0.999621916911), (0, 0), align=None)
    chamfer_3_piece_30 = extrude(amount=18.499999993, mode=Mode.PRIVATE)
    chamfer_3_piece_30 = chamfer_3_piece_30 - Plane(origin=(0, 19.832051371, 0), x_dir=(0, 0, 1), z_dir=(0, -1, 0)) * Cylinder(18, 39, mode=Mode.PRIVATE)
    add(chamfer_3_piece_30, mode=Mode.SUBTRACT)
    with BuildSketch(Plane(origin=(18.5, 18, -18), x_dir=(1, 0, 0), z_dir=(0, -1, 0))) as chamfer_3_piece_31:
        Polygon((2, CHAMFER_3_SIZE), (2 - CHAMFER_3_SIZE, 0), (2, 0), align=None)
    revolve(axis=Axis((18.5, 18, -18), (0, 0, 1)), revolution_arc=90, mode=Mode.SUBTRACT)
    with BuildSketch(Plane(origin=(-18.5, 18, -18), x_dir=(0, 1, 0), z_dir=(1, 0, 0))) as chamfer_3_piece_32:
        Polygon((2, CHAMFER_3_SIZE), (2 - CHAMFER_3_SIZE, 0), (2, 0), align=None)
    revolve(axis=Axis((-18.5, 18, -18), (0, 0, 1)), revolution_arc=90, mode=Mode.SUBTRACT)
    with BuildSketch(Plane(origin=(18.5, 20, 18), x_dir=(0, -0.9996219169112968, 0.027495876610589005), z_dir=(-1, 0, 0))) as chamfer_3_piece_33_section:
        Polygon((CHAMFER_3_SIZE * 0.999621916911, -CHAMFER_3_SIZE * 0.0274958766106), (-CHAMFER_3_SIZE * 0.0274958766106, -CHAMFER_3_SIZE * 0.999621916911), (0, 0), align=None)
    chamfer_3_piece_33 = extrude(amount=18.5, mode=Mode.PRIVATE)
    chamfer_3_piece_33 = chamfer_3_piece_33 - Plane(origin=(0, 19.78751499, 0), x_dir=(0, 0, 1), z_dir=(0, -1, 0)) * Cylinder(18, 39, mode=Mode.PRIVATE)
    add(chamfer_3_piece_33, mode=Mode.SUBTRACT)
    with BuildSketch(Plane(origin=(18.5, 18, 18), x_dir=(1, 0, 0), z_dir=(0, -1, 0))) as chamfer_3_piece_34:
        Polygon((2 - CHAMFER_3_SIZE, 0), (2, -CHAMFER_3_SIZE), (2, 0), align=None)
    revolve(axis=Axis((18.5, 18, 18), (0, 0, 1)), revolution_arc=90, mode=Mode.SUBTRACT)
    with BuildSketch(Plane(origin=(-18.5, 18, 18), x_dir=(0, 1, 0), z_dir=(1, 0, 0))) as chamfer_3_piece_35:
        Polygon((2 - CHAMFER_3_SIZE, 0), (2, -CHAMFER_3_SIZE), (2, 0), align=None)
    revolve(axis=Axis((-18.5, 18, 18), (0, 0, 1)), revolution_arc=90, mode=Mode.SUBTRACT)
    with BuildSketch(Plane(origin=(0, 25, 0), x_dir=(0, 0, 1), z_dir=(-1, 0, 0))) as chamfer_3_piece_36:
        Polygon((13.5 - CHAMFER_3_SIZE, 0), (13.5, -CHAMFER_3_SIZE), (13.5, 0), align=None)
    revolve(axis=Axis((0, 25, 0), (0, 1, 0)), mode=Mode.SUBTRACT)
    with BuildSketch(Plane(origin=(7e-09, 20, -18), x_dir=(0, 0.027495876610589005, 0.9996219169112968), z_dir=(-1, 0, 0))) as chamfer_3_piece_37_section:
        Polygon((CHAMFER_3_SIZE * 0.999621916911, -CHAMFER_3_SIZE * 0.0274958766106), (-CHAMFER_3_SIZE * 0.0274958766106, -CHAMFER_3_SIZE * 0.999621916911), (0, 0), align=None)
    chamfer_3_piece_37 = extrude(amount=18.500000007, mode=Mode.PRIVATE)
    chamfer_3_piece_37 = chamfer_3_piece_37 - Plane(origin=(0, 19.832051367, 0), x_dir=(0, 0, 1), z_dir=(0, -1, 0)) * Cylinder(18, 39, mode=Mode.PRIVATE)
    add(chamfer_3_piece_37, mode=Mode.SUBTRACT)
    with BuildSketch(Plane(origin=(0, 20, 18), x_dir=(0, -0.9996219169112968, 0.027495876610589005), z_dir=(-1, 0, 0))) as chamfer_3_piece_38_section:
        Polygon((CHAMFER_3_SIZE * 0.999621916911, -CHAMFER_3_SIZE * 0.0274958766106), (-CHAMFER_3_SIZE * 0.0274958766106, -CHAMFER_3_SIZE * 0.999621916911), (0, 0), align=None)
    chamfer_3_piece_38 = extrude(amount=18.5, mode=Mode.PRIVATE)
    chamfer_3_piece_38 = chamfer_3_piece_38 - Plane(origin=(0, 19.832051366, 0), x_dir=(0, 0, 1), z_dir=(0, -1, 0)) * Cylinder(18, 39, mode=Mode.PRIVATE)
    add(chamfer_3_piece_38, mode=Mode.SUBTRACT)
    with BuildSketch(Plane(origin=(0, 22.5, 0), x_dir=(0, 0, 1), z_dir=(-1, 0, 0))) as chamfer_3_piece_39:
        Polygon((18, -CHAMFER_3_SIZE), (18 - CHAMFER_3_SIZE, 0), (18, 0), align=None)
    revolve(axis=Axis((0, 22.5, 0), (0, 1, 0)), mode=Mode.SUBTRACT)


solid = part.part
